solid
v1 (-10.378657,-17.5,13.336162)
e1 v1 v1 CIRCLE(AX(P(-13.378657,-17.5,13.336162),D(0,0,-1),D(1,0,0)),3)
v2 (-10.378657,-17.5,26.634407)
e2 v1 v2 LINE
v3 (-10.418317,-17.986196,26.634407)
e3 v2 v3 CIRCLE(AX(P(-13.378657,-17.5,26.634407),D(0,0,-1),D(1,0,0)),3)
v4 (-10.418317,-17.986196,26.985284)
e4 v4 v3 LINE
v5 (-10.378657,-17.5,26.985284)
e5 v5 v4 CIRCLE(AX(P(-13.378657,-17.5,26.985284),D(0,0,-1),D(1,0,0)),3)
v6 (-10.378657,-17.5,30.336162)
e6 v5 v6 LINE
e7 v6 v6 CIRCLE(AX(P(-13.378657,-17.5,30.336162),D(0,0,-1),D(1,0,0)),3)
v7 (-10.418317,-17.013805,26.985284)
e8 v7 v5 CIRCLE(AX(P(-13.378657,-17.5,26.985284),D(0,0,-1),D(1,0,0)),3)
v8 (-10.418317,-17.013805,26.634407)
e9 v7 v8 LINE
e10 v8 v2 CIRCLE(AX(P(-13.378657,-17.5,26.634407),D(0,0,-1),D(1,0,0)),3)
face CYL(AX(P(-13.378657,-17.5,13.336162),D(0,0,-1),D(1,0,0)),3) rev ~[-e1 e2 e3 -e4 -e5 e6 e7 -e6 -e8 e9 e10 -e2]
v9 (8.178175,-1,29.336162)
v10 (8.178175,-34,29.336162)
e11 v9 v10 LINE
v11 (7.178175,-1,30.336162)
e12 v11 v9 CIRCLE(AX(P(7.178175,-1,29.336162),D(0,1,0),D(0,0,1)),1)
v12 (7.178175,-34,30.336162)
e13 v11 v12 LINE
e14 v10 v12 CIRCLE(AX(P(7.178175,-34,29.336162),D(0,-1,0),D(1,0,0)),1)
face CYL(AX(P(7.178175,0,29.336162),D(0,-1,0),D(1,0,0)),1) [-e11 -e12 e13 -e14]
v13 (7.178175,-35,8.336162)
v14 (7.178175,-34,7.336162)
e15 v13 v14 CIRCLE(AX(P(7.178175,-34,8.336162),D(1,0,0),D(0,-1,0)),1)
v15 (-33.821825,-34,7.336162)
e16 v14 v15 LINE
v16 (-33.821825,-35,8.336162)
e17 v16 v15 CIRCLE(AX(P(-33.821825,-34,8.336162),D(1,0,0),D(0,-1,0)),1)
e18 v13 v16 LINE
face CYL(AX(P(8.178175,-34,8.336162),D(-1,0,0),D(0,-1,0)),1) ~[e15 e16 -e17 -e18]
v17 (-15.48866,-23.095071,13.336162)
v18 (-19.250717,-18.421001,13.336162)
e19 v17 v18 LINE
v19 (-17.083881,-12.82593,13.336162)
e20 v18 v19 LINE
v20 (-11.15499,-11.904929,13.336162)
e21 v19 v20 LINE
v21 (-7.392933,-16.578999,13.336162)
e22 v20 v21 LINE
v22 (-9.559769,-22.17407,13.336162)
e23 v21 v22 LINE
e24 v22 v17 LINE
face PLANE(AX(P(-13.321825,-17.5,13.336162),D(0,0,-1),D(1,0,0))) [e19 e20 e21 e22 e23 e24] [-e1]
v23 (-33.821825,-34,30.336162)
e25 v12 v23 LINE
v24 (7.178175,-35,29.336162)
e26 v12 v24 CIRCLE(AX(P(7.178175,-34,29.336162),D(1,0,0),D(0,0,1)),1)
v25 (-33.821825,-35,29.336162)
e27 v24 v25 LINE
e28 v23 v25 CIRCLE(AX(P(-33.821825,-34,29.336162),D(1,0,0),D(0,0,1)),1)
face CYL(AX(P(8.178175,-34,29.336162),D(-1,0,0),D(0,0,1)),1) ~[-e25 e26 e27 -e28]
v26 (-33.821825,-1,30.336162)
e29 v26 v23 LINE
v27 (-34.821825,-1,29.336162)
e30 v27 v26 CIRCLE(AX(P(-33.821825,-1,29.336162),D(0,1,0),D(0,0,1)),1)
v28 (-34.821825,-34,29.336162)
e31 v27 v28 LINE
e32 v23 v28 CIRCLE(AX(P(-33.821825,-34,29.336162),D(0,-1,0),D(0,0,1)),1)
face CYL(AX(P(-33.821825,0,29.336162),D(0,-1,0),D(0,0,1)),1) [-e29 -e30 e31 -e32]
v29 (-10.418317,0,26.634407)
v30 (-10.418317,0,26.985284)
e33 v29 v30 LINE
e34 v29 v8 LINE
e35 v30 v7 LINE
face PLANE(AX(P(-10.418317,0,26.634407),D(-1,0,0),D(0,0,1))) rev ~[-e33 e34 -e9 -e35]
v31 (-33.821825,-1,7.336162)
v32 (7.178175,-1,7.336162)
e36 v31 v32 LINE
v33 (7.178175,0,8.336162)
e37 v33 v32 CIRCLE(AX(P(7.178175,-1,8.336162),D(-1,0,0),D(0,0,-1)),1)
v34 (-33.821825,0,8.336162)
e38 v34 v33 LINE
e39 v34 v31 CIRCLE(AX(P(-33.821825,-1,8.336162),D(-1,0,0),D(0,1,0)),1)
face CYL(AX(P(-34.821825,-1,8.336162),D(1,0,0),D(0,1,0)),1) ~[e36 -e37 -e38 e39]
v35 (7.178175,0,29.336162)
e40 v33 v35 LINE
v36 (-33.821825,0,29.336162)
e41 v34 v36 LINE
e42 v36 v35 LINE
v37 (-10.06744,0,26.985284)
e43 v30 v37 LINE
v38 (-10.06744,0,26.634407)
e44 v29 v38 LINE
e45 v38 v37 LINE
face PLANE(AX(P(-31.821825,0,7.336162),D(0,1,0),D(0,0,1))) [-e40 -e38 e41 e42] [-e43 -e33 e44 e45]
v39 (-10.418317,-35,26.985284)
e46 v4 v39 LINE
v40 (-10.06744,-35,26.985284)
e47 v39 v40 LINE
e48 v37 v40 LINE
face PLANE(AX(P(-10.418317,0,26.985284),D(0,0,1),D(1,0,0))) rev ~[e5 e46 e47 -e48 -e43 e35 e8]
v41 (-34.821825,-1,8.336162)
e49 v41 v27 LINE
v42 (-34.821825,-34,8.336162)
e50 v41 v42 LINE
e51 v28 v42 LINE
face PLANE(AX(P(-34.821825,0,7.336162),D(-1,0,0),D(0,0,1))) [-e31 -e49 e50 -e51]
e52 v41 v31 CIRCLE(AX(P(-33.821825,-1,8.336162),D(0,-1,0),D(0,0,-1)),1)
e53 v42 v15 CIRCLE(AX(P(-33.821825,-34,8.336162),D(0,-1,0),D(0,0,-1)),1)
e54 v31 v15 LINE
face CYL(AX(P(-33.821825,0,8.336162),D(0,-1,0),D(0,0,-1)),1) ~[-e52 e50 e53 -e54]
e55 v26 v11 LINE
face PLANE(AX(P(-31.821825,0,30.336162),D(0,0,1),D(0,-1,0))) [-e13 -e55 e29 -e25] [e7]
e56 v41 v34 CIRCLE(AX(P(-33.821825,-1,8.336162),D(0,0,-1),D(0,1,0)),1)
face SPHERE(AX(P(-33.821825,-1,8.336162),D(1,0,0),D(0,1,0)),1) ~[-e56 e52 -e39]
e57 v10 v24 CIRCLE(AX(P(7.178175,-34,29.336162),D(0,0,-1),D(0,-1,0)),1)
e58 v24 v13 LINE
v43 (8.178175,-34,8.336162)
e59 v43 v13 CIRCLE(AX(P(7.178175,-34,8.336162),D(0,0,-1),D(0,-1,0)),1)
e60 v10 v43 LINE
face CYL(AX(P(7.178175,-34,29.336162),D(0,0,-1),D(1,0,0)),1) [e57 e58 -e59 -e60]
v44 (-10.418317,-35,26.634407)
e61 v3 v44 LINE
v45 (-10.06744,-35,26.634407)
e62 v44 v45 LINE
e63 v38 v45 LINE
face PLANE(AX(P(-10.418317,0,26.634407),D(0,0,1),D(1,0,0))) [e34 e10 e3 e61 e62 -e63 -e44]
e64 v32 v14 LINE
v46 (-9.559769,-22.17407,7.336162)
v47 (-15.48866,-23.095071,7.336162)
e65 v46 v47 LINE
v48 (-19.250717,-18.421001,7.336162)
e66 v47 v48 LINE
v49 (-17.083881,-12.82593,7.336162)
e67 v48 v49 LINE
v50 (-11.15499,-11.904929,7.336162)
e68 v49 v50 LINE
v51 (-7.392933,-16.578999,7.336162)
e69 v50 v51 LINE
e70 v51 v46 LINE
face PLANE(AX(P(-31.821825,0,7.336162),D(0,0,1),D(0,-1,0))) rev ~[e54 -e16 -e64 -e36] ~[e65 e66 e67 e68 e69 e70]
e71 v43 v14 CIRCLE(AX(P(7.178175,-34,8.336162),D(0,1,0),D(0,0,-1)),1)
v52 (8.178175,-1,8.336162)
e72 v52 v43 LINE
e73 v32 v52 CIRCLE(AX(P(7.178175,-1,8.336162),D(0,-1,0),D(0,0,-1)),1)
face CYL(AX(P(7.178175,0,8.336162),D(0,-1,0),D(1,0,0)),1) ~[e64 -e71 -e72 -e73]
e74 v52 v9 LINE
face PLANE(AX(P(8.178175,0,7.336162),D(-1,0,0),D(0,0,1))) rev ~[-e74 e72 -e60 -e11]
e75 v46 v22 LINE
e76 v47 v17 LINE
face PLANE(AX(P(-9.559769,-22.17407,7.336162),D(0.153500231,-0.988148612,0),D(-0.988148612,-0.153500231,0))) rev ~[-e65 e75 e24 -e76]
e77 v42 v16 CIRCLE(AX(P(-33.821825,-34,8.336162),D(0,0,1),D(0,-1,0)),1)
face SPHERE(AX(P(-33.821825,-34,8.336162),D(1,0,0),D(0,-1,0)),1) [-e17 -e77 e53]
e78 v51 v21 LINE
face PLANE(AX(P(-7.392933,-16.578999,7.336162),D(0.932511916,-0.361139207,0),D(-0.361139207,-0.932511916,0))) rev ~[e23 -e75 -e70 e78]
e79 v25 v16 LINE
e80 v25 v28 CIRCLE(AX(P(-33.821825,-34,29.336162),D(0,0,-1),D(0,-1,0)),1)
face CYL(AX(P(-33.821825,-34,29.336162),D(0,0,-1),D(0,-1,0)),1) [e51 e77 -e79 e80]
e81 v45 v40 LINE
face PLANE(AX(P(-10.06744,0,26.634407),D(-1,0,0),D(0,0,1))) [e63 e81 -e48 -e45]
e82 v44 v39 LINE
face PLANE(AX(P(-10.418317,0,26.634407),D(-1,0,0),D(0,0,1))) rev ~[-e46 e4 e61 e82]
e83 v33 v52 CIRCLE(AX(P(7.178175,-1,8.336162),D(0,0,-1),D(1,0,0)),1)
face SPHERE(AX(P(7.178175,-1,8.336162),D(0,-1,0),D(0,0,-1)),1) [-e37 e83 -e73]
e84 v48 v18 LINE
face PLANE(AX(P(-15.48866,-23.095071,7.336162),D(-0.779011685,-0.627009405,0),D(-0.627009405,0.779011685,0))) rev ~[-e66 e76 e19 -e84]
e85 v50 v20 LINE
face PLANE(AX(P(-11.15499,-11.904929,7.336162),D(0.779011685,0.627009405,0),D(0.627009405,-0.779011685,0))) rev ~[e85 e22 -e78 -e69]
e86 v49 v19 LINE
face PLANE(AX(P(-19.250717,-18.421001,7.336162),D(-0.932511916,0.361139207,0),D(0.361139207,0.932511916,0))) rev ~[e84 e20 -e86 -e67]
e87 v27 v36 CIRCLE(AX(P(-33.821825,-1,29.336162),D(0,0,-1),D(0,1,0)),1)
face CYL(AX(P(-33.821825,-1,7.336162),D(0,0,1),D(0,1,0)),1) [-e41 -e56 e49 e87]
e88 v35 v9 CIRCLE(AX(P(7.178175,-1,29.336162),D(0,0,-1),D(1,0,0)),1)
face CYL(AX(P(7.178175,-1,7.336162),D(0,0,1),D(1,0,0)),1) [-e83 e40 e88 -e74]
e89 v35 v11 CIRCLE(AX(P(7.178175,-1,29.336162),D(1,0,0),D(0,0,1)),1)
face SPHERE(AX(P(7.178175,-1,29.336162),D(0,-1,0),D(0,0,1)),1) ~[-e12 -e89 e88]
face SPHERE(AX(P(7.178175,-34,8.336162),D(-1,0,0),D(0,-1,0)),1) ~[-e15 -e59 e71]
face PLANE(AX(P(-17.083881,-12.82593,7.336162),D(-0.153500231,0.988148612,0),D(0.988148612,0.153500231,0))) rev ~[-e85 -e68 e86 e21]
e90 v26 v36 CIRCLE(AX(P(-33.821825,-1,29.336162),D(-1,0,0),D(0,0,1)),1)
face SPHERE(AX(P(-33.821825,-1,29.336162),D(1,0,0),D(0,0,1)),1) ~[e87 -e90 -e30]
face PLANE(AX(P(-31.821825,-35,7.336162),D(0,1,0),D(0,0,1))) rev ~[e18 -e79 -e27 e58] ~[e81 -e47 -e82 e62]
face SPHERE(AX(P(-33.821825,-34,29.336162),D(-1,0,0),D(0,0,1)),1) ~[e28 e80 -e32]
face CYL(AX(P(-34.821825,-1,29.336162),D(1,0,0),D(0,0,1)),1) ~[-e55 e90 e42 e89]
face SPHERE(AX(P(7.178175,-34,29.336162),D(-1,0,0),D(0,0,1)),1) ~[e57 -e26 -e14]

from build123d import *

# Parameters (mm, degrees)
F0_W      = 40
F0_H      = 23
F0_W_2    = 0.3508773884
F0_H_2    = 0.3508765315
F1_DEPTH  = 35
F2_DEPTH  = 3
F3_R      = 1
F4_R      = 1
F8_DEPTH  = 6
F10_R     = 3
F11_DEPTH = 17


# Not quite as in the source:
# - two fillets or chamfers of one size are made in one step


with BuildPart() as f1:
    # F0 (on Front) → F1 (new body)
    with BuildSketch(Plane.XZ):
        with Locations((-11.8218250573, 18.8361621085)):
            Rectangle(F0_W, F0_H)
        with Locations((-10.2428785232, 26.8098455974)):
            Rectangle(F0_W_2, F0_H_2, mode=Mode.SUBTRACT)
    extrude(amount=F1_DEPTH)

    # F2 (add): a face of the model
    f2_faces = [f1.faces().sort_by_distance(p)[0] for p in [
        (-31.8218250573, -17.5, 18.8361621085),
    ]]
    extrude(f2_faces, amount=F2_DEPTH)

    # F3
    f3_edges = [f1.edges().sort_by_distance(p)[0] for p in [
        (-13.321825, -35, 30.336162),
    ]]
    fillet(f3_edges, radius=F3_R)

    # F4
    f4_edges = [f1.edges().sort_by_distance(p)[0] for p in [
        (-13.321825, -35, 7.336162),
        (8.178175, -17, 30.336162),
        (8.178175, -17.5, 7.336162),
        (-13.321825, 0, 30.336162),
        (-13.321825, 0, 7.336162),
        (-34.821825, -17, 30.336162),
        (8.178175, -34.707107, 30.043269),
        (8.178175, 0, 18.836162),
        (8.178175, -35, 18.336162),
        (-34.821825, -34.707107, 30.043269),
        (-34.821825, 0, 18.836162),
        (-34.821825, -35, 18.336162),
        (-34.821825, -17.5, 7.336162),
    ]]
    fillet(f4_edges, radius=F4_R)

    # F7 (on face) → F8 (cut)
    with BuildSketch(Plane(origin=(0, 0, 7.3361621085), x_dir=(1, 0, 0), z_dir=(0, 0, -1))):
        Polygon((-15.4886602973, 23.0950714957), (-19.2507167286, 18.4210013842), (-17.0838814885, 12.8259298884), (-11.1549898172, 11.9049285043), (-7.3929333859, 16.5789986158), (-9.559768626, 22.1740701116), align=None)
    extrude(amount=-F8_DEPTH, mode=Mode.SUBTRACT)

    # F10 (on face) → F11 (cut, through all)
    with BuildSketch(Plane(origin=(0, 0, 13.3361621085), x_dir=(1, 0, 0), z_dir=(0, 0, -1))):
        with Locations((-13.3786574006, 17.5000000745)):
            Circle(F10_R)
    extrude(amount=-F11_DEPTH, mode=Mode.SUBTRACT)


solid = f1.part
